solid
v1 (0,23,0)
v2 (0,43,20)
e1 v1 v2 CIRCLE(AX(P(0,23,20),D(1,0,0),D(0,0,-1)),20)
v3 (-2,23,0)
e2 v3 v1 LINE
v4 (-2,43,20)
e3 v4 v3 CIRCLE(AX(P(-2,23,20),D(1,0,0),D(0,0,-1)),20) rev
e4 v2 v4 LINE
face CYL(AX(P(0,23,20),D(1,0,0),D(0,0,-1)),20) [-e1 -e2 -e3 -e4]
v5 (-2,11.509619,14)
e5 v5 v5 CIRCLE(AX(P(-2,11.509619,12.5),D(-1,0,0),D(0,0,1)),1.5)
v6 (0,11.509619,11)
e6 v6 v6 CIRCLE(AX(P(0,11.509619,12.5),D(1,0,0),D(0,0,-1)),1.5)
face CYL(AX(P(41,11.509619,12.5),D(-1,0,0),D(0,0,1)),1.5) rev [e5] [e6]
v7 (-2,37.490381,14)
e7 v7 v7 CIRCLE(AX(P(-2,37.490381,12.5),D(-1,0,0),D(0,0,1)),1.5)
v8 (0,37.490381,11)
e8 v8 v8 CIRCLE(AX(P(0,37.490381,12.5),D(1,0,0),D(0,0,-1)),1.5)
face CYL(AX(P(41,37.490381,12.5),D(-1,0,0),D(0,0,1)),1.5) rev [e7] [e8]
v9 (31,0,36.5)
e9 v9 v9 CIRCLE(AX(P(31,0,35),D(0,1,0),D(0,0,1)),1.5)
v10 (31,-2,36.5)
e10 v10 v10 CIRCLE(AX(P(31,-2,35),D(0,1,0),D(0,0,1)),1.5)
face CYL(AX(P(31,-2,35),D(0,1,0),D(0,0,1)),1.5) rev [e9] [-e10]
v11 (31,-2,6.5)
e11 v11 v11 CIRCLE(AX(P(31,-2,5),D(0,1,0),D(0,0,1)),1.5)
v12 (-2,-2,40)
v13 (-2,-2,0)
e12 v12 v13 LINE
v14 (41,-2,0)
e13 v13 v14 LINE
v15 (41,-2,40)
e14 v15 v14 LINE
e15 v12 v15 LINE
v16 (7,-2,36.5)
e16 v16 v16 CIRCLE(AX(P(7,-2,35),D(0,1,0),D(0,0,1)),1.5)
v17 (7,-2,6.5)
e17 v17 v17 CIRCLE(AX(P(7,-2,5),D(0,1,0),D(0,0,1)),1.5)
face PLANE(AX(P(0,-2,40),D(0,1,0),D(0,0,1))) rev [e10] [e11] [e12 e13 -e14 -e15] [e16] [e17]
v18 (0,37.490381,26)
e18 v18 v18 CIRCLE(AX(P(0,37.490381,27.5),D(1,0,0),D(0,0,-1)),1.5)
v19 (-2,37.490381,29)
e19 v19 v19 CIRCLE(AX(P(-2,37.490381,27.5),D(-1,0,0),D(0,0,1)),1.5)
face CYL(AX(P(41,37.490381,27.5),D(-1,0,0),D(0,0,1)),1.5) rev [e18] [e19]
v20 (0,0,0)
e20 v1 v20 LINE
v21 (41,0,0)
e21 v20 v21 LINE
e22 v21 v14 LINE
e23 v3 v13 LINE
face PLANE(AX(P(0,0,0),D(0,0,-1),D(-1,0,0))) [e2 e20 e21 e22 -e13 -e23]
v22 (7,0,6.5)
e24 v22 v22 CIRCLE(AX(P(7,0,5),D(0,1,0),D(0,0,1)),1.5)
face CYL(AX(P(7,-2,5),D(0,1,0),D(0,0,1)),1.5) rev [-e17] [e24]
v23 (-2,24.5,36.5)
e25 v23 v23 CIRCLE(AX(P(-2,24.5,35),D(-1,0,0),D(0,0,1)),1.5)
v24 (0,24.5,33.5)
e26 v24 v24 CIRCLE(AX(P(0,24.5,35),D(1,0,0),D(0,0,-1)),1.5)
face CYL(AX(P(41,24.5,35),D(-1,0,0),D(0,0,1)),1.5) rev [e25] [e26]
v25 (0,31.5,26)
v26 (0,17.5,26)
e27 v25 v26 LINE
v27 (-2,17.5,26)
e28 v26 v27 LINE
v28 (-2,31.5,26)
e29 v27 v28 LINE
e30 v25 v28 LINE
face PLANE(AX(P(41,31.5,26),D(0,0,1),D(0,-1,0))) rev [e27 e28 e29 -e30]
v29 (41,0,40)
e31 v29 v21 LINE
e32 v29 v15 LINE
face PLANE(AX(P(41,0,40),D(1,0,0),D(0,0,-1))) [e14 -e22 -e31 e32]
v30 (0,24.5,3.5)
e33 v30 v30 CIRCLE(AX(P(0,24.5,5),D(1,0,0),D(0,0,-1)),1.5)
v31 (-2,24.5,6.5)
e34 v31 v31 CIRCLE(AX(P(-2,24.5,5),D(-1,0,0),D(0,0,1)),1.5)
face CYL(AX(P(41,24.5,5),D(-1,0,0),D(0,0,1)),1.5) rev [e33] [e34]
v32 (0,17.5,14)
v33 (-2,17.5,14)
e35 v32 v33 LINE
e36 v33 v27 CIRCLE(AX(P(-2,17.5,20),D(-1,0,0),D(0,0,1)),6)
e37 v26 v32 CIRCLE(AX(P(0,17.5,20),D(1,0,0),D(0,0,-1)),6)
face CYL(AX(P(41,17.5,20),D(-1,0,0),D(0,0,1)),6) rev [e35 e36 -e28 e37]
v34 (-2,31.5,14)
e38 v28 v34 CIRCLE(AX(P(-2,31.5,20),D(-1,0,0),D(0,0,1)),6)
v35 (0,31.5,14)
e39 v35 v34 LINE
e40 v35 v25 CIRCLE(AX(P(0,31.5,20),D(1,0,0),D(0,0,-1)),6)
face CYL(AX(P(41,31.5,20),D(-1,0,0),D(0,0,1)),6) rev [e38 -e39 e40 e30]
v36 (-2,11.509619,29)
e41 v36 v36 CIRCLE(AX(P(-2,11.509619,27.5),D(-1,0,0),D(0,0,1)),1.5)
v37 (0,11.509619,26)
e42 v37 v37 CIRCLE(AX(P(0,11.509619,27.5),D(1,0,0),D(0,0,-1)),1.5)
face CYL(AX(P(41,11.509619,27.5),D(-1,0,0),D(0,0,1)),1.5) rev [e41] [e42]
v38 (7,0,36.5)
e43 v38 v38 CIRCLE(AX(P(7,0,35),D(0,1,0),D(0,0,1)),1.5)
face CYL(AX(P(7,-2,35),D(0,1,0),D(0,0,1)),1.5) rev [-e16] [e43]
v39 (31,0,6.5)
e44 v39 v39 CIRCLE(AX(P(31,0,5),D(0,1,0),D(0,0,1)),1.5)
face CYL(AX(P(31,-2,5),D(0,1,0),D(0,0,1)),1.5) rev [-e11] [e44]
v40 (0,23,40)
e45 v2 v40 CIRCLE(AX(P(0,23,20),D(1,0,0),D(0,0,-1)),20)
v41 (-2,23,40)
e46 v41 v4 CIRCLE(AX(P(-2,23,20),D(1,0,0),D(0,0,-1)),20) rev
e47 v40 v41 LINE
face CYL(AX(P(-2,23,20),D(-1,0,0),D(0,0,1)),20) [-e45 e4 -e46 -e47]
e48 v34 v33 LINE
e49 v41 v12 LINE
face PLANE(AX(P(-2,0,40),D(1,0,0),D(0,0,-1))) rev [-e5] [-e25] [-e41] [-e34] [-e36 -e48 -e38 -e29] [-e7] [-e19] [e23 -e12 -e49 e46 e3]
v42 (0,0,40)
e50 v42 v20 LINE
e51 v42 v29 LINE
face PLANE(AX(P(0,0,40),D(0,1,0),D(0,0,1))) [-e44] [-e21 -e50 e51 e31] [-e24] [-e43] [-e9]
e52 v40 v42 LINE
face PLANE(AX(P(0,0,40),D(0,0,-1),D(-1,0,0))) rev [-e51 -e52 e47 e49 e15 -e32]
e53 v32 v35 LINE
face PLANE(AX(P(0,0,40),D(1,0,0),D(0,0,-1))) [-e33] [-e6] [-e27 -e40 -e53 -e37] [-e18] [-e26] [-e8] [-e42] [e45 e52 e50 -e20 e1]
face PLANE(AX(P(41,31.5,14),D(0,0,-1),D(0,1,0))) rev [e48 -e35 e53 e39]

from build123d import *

# Parameters (mm, degrees)
EXTRUDE_1_DEPTH     = 40
SKETCH_2_R          = 1.5
CUT_EXTRUDE_1_DEPTH = 73.78736154
FILLET_1_R          = 20
CUT_EXTRUDE_2_DEPTH = 73.78736154
SKETCH_4_R          = 1.5
CUT_EXTRUDE_3_DEPTH = 72.624018318


with BuildPart() as part:
    # 草图1 → 拉伸-薄壁1 (new body)
    with BuildSketch(Plane.XY):
        Polygon((41, 0), (0, 0), (0, 43), (-2, 43), (-2, -2), (41, -2), align=None)
    extrude(amount=EXTRUDE_1_DEPTH)

    # 草图2 → 切除-拉伸1 (cut, through all)
    with BuildSketch(Plane.ZY.offset(2)):
        with Locations((35, 24.5)):
            Circle(SKETCH_2_R)
        with Locations((27.5, 11.509618943)):
            Circle(SKETCH_2_R)
        with Locations((12.5, 11.509618943)):
            Circle(SKETCH_2_R)
        with Locations((5, 24.5)):
            Circle(SKETCH_2_R)
        with Locations((12.5, 37.490381057)):
            Circle(SKETCH_2_R)
        with Locations((27.5, 37.490381057)):
            Circle(SKETCH_2_R)
    extrude(amount=-CUT_EXTRUDE_1_DEPTH, mode=Mode.SUBTRACT)

    # 圆角1
    fillet_1_edges = [part.edges().sort_by_distance(p)[0] for p in [
        (-1, 43, 40),
        (-1, 43, 0),
    ]]
    fillet(fillet_1_edges, radius=FILLET_1_R - 0.0001)  # a hair under: the kernel refuses the full size

    # 草图3 → 切除-拉伸2 (cut, through all)
    with BuildSketch(Plane.ZY.offset(2)):
        with BuildLine():
            Line((26, 31.5), (26, 17.5))
            ThreePointArc((26, 17.5), (20, 11.5), (14, 17.5))
            Line((14, 17.5), (14, 31.5))
            ThreePointArc((14, 31.5), (20, 37.5), (26, 31.5))
        make_face()
    extrude(amount=-CUT_EXTRUDE_2_DEPTH, mode=Mode.SUBTRACT)

    # 草图4 → 切除-拉伸3 (cut, through all)
    with BuildSketch(Plane(origin=(0, 0, 0), x_dir=(1, 0, 0), z_dir=(0, 1, 0))):
        with Locations(Location((7, -35, 0), (0, 0, 270))):
            Circle(SKETCH_4_R)
        with Locations(Location((31, -35, 0), (0, 0, 270))):
            Circle(SKETCH_4_R)
        with Locations(Location((31, -5, 0), (0, 0, 270))):
            Circle(SKETCH_4_R)
        with Locations(Location((7, -5, 0), (0, 0, 270))):
            Circle(SKETCH_4_R)
    extrude(amount=-CUT_EXTRUDE_3_DEPTH, mode=Mode.SUBTRACT)


solid = part.part
